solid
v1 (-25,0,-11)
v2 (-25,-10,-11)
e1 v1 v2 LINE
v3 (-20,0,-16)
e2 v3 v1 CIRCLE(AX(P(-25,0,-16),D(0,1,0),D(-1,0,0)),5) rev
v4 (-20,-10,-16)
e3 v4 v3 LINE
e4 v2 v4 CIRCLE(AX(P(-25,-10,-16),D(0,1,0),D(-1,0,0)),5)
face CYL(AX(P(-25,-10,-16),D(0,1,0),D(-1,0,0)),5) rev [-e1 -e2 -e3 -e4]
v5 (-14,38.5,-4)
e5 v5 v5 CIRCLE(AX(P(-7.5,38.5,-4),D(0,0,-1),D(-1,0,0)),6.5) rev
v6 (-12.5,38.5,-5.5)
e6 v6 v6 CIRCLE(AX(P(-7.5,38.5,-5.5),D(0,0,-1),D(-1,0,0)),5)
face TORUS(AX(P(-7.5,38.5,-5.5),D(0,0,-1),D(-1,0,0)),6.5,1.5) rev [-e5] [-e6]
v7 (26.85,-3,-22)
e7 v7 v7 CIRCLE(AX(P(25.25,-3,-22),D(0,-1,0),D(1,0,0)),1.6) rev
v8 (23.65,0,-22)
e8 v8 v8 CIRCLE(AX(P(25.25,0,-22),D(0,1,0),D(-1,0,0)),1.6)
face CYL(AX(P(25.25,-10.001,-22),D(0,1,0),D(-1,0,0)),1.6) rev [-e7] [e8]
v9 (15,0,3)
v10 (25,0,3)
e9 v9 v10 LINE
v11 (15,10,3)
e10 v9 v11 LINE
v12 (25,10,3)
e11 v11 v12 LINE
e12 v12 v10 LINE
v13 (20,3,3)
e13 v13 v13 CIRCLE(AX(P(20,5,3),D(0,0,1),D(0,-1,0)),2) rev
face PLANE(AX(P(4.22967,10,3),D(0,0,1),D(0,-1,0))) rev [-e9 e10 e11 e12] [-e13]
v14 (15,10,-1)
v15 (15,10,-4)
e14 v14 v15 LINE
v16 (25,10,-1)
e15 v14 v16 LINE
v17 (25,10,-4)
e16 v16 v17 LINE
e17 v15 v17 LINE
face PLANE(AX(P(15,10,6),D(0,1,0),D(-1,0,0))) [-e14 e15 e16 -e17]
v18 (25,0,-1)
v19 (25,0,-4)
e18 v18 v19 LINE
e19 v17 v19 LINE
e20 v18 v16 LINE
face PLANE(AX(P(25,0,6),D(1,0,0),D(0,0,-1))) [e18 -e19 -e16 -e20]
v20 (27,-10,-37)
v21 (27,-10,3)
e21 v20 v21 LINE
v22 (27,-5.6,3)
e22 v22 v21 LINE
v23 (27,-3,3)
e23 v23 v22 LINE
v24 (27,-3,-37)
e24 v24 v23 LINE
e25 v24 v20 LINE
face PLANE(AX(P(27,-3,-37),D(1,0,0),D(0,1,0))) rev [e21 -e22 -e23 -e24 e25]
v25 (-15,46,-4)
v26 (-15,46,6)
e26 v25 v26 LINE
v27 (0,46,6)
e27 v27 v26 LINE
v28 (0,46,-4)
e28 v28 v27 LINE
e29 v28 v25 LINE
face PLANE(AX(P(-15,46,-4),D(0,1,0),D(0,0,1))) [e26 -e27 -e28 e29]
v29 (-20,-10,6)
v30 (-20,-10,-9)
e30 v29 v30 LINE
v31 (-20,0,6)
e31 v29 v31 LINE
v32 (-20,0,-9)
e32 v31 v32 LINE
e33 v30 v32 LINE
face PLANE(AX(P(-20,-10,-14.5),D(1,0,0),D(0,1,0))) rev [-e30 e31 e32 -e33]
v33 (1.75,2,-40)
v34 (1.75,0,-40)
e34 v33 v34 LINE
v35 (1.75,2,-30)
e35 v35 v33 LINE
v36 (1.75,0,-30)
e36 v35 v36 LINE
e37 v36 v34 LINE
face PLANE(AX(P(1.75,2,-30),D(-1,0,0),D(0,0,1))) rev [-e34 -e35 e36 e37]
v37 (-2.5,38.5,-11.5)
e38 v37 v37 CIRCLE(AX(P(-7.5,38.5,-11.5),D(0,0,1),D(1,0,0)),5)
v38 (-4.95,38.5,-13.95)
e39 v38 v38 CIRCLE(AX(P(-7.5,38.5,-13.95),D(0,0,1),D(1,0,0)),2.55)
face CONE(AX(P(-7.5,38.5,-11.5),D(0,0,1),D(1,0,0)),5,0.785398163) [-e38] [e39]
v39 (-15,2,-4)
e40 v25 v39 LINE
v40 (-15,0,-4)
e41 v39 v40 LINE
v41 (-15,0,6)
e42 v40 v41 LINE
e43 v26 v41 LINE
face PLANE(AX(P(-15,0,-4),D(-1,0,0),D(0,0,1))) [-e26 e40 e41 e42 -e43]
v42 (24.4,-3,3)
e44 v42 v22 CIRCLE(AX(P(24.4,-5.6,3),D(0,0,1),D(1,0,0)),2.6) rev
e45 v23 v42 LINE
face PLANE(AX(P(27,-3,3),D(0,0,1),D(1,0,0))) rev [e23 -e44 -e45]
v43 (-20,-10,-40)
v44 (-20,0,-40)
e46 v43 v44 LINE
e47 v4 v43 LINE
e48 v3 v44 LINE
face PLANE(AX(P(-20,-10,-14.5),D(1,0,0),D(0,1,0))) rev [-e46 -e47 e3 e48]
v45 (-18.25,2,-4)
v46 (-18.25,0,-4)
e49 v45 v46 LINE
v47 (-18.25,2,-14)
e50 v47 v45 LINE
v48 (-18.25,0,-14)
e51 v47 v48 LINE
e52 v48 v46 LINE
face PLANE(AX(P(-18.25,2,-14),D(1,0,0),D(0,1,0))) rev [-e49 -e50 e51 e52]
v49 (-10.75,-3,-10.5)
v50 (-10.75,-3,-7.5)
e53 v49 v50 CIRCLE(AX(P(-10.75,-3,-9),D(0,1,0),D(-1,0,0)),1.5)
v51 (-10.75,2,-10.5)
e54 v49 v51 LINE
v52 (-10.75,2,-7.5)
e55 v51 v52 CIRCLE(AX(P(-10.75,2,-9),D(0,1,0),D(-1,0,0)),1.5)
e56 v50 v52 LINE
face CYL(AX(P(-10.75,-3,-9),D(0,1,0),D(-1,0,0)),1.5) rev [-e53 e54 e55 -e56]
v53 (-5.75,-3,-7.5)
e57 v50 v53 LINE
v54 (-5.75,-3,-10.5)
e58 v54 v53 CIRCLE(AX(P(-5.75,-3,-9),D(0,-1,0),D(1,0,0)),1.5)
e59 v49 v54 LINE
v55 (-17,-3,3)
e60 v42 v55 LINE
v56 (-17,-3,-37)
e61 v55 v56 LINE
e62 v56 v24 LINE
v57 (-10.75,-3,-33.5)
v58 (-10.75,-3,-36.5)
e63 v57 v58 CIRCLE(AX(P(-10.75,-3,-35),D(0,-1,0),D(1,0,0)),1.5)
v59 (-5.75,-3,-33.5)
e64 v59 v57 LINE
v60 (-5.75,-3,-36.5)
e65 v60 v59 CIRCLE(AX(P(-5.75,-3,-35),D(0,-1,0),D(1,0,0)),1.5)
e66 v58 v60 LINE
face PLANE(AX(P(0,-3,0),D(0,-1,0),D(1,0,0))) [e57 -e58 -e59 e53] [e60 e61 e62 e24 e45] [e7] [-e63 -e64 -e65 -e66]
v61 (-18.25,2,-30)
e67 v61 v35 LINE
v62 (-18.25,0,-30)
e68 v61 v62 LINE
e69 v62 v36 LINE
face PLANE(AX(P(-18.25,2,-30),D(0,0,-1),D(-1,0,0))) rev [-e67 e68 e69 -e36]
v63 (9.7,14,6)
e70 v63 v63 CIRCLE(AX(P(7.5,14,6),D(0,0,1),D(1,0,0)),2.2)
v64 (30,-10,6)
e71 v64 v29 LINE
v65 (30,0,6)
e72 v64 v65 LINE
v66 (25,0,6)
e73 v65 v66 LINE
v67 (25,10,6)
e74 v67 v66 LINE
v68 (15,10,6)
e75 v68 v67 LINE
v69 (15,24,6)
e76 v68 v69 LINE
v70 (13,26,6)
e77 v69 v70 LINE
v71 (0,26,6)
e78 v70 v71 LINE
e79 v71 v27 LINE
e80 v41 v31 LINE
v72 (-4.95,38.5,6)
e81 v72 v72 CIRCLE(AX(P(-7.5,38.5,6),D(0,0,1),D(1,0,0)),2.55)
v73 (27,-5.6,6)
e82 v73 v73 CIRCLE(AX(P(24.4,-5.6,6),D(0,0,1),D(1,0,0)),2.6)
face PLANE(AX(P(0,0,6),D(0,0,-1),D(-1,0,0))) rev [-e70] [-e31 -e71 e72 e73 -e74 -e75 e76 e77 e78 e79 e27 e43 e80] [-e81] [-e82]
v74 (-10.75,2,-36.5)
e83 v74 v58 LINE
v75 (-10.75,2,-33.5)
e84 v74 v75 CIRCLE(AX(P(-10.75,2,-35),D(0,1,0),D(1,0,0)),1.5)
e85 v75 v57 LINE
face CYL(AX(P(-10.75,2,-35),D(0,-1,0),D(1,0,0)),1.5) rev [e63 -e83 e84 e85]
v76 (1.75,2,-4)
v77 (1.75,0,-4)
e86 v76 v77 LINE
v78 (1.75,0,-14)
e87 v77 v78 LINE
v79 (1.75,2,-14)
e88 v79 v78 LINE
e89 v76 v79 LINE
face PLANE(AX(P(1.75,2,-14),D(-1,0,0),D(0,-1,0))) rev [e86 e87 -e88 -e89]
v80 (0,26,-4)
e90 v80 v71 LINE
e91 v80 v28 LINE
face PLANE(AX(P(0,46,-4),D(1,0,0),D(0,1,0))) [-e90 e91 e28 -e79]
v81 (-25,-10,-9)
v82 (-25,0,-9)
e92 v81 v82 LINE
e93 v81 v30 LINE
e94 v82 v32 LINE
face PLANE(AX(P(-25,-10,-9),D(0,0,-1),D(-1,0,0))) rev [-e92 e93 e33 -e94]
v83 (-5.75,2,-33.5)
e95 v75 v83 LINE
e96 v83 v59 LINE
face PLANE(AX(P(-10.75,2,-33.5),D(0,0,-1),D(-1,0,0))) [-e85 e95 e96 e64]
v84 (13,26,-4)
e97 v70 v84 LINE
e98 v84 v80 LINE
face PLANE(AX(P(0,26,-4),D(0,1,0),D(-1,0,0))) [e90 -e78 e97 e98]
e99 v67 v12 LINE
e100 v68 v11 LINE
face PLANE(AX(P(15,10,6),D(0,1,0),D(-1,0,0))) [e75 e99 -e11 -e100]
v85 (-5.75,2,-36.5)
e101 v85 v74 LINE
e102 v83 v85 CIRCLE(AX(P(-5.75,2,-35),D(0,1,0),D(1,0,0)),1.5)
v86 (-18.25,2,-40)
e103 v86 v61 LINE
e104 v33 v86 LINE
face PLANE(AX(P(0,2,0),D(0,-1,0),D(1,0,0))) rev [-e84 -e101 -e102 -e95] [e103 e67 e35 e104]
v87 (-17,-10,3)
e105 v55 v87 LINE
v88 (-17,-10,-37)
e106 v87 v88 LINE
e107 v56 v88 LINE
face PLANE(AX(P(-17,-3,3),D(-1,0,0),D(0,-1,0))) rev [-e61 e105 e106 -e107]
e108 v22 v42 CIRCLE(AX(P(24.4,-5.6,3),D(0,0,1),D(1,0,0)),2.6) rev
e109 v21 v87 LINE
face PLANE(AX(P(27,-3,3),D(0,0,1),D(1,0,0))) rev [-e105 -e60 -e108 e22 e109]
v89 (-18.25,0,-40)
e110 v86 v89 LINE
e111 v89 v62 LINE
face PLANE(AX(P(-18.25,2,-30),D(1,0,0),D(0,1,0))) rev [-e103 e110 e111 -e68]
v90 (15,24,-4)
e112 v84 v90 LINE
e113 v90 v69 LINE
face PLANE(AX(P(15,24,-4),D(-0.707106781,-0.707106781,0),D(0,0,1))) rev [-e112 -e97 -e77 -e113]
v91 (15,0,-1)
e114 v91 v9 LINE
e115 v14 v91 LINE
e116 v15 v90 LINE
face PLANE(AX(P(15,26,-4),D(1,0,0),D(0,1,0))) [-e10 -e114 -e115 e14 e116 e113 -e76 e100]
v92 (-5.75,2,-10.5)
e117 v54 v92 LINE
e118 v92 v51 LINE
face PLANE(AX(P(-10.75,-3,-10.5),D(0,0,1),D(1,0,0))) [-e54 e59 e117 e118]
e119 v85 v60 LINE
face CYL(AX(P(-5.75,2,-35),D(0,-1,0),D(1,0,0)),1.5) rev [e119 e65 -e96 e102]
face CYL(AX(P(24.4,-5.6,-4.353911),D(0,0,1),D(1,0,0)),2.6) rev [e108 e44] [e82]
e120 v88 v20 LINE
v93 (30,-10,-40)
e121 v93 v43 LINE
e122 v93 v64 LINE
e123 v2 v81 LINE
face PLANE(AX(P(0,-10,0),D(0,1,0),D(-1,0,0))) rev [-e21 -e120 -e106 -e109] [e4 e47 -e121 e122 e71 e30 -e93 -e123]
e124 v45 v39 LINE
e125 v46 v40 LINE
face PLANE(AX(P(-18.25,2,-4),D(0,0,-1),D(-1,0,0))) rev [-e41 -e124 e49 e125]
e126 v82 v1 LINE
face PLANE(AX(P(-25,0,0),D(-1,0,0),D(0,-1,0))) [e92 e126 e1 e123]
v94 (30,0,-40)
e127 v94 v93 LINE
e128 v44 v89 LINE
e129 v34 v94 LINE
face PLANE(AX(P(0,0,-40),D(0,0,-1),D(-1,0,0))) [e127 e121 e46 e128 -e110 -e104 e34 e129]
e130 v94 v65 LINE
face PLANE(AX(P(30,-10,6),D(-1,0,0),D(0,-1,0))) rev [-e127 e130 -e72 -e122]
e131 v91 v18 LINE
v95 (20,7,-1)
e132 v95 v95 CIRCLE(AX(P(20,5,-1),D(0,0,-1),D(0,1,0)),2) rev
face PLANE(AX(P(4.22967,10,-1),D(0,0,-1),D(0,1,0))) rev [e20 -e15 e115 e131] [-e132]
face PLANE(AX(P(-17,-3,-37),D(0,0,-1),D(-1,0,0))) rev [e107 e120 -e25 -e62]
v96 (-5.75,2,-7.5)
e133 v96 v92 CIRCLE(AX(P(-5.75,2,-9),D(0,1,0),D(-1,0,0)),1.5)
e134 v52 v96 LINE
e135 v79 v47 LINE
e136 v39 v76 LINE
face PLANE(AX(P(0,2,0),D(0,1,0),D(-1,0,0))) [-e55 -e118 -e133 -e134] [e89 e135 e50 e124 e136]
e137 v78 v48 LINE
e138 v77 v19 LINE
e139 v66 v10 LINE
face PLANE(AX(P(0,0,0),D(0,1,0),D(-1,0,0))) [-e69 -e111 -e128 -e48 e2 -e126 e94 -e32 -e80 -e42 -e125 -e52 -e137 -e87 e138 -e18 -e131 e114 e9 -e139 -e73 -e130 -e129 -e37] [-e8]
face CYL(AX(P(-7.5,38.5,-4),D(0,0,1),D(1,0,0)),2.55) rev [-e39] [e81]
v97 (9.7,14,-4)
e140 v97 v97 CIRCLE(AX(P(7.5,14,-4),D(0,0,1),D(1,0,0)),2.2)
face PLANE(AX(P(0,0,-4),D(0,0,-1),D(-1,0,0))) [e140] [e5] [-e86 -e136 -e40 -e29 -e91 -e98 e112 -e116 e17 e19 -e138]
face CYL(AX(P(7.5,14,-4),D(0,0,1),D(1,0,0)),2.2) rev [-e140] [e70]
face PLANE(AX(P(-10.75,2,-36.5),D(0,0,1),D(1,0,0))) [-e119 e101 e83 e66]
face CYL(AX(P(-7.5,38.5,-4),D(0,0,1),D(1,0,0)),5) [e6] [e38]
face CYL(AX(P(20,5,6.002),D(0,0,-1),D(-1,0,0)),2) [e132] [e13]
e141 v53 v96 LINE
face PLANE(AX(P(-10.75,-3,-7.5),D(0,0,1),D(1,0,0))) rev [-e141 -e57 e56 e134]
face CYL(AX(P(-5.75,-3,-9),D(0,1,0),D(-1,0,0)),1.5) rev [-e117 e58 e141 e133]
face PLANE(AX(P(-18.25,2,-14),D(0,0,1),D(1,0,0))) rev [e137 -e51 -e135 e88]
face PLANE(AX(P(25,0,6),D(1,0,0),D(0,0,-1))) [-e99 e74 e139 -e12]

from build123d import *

# Parameters (mm, degrees)
BOSS_EXTRUDE1_DEPTH      = 6
BOSS_EXTRUDE1_DEPTH_BACK = 4
SKETCH1_R                = 2.55
SKETCH1_R_2              = 2.2
SKETCH4_W                = 10
SKETCH4_H                = 10
BOSS_EXTRUDE4_DEPTH      = 10
SKETCH5_W                = 4
SKETCH5_H                = 10
CUT_EXTRUDE1_DEPTH       = 10
BOSS_EXTRUDE5_REACH      = 54.82
SKETCH6_R                = 2
CHAMFER1_SIZE            = 2
SKETCH7_W                = 50
SKETCH7_H                = 20.5
BOSS_EXTRUDE6_DEPTH      = 10
SKETCH13_W               = 50
SKETCH13_H               = 10
BOSS_EXTRUDE9_DEPTH      = 25.5
SKETCH16_W               = 44
SKETCH16_H               = 40
CUT_EXTRUDE3_DEPTH       = 7
SKETCH17_R               = 2.6
CUT_EXTRUDE4_DEPTH       = 3
SKETCH18_W               = 2
SKETCH18_H               = 10
BOSS_EXTRUDE11_DEPTH     = 5
FILLET2_R                = 5
CUT_EXTRUDE5_REACH       = 67.666
SKETCH20_R               = 2.55
FILLET5_R                = 1.5
CUT_EXTRUDE6_DEPTH       = 3
BOSS_EXTRUDE12_START     = 2
SKETCH22_W               = 20
SKETCH22_H               = 10
BOSS_EXTRUDE12_DEPTH     = 2
CUT_EXTRUDE7_REACH       = 69.941
SKETCH23_R               = 1.6
CUT_EXTRUDE8_DEPTH       = 68.941151006


with BuildPart() as part:
    # Sketch1 → Boss-Extrude1 (new, two sides: drawn at the far end of the back side and taken through both)
    with BuildSketch(Plane.XY.offset(-BOSS_EXTRUDE1_DEPTH_BACK)):
        Polygon((-15, 0), (-15, 46), (0, 46), (0, 26), (15, 26), (15, 0), align=None)
        with Locations((-7.5, 38.5)):
            Circle(SKETCH1_R, mode=Mode.SUBTRACT)
        with Locations((7.5, 14)):
            Circle(SKETCH1_R_2, mode=Mode.SUBTRACT)
    extrude(amount=BOSS_EXTRUDE1_DEPTH + BOSS_EXTRUDE1_DEPTH_BACK)

    # Sketch4 → Boss-Extrude4 (add)
    with BuildSketch(Plane(origin=(0, 0, -4), x_dir=(-1, 0, 0), z_dir=(0, 0, -1))):
        with Locations((-20, 5)):
            Rectangle(SKETCH4_W, SKETCH4_H)
    extrude(amount=-BOSS_EXTRUDE4_DEPTH)

    # Sketch5 → Cut-Extrude1 (cut)
    with BuildSketch(Plane(origin=(25, 0, 0), x_dir=(0, 0, -1), z_dir=(1, 0, 0))):
        with Locations((-1, 5)):
            Rectangle(SKETCH5_W, SKETCH5_H)
    extrude(amount=-CUT_EXTRUDE1_DEPTH, mode=Mode.SUBTRACT)

    # Sketch6 → Boss-Extrude5 (add, up to next)
    with BuildSketch(Plane.XY.offset(-1), mode=Mode.PRIVATE) as boss_extrude5_sk1:
        with Locations(Location((20, 5, 0), (0, 0, 90))):
            Circle(SKETCH6_R)
    boss_extrude5_tool1 = extrude(boss_extrude5_sk1.sketch, amount=BOSS_EXTRUDE5_REACH, mode=Mode.PRIVATE) - part.part
    add(boss_extrude5_tool1.solids().sort_by_distance((20, 5, -1))[0])

    # Chamfer1
    chamfer1_edges = [part.edges().sort_by_distance(p)[0] for p in [
        (15, 26, 1),
    ]]
    chamfer(chamfer1_edges, length=CHAMFER1_SIZE)

    # Sketch7 → Boss-Extrude6 (add)
    with BuildSketch(Plane.XZ):
        with Locations((5, -4.25)):
            Rectangle(SKETCH7_W, SKETCH7_H)
    extrude(amount=BOSS_EXTRUDE6_DEPTH)

    # Sketch13 → Boss-Extrude9 (add)
    with BuildSketch(Plane(origin=(0, 0, -14.5), x_dir=(-1, 0, 0), z_dir=(0, 0, -1))):
        with Locations((-5, -5)):
            Rectangle(SKETCH13_W, SKETCH13_H)
    extrude(amount=BOSS_EXTRUDE9_DEPTH)

    # Sketch16 → Cut-Extrude3 (cut)
    with BuildSketch(Plane.XZ.offset(10)):
        with Locations((5, -17)):
            Rectangle(SKETCH16_W, SKETCH16_H)
    extrude(amount=-CUT_EXTRUDE3_DEPTH, mode=Mode.SUBTRACT)

    # Sketch17 → Cut-Extrude4 (cut)
    with BuildSketch(Plane.XY.offset(6)):
        with Locations((24.4, -5.6)):
            Circle(SKETCH17_R)
    extrude(amount=-CUT_EXTRUDE4_DEPTH, mode=Mode.SUBTRACT)

    # Sketch18 → Boss-Extrude11 (add)
    with BuildSketch(Plane.ZY.offset(20)):
        with Locations((-10, -5)):
            Rectangle(SKETCH18_W, SKETCH18_H)
    extrude(amount=BOSS_EXTRUDE11_DEPTH)

    # Fillet2
    fillet2_edges = [part.edges().sort_by_distance(p)[0] for p in [
        (-20, -5, -11),
    ]]
    fillet(fillet2_edges, radius=FILLET2_R - 0.0001)  # a hair under: the kernel refuses the full size

    # Sketch19 → Revolve1 (revolve)
    with BuildSketch(Plane.ZY.offset(7.5), mode=Mode.PRIVATE) as revolve1_sk:
        Polygon((-4, 38.5), (-14, 38.5), (-14, 41), (-11.5, 43.5), (-4, 43.5), align=None)
    revolve(revolve1_sk.sketch.rotate(Axis((-7.5, 38.5, -4), (0, 0, -1)), 90), axis=Axis((-7.5, 38.5, -4), (0, 0, -1)))

    # Sketch20 → Cut-Extrude5 (cut, up to next)
    with BuildSketch(Plane.XY.offset(-4), mode=Mode.PRIVATE) as cut_extrude5_sk1:
        with Locations((-7.5, 38.5)):
            Circle(SKETCH20_R)
    cut_extrude5_tool1 = extrude(cut_extrude5_sk1.sketch, amount=-CUT_EXTRUDE5_REACH, mode=Mode.PRIVATE) & part.part
    add(cut_extrude5_tool1.solids().sort_by_distance((-7.5, 38.5, -4))[0], mode=Mode.SUBTRACT)

    # Fillet5
    fillet5_edges = [part.edges().sort_by_distance(p)[0] for p in [
        (-12.5, 38.5, -4),
    ]]
    fillet(fillet5_edges, radius=FILLET5_R)

    # Sketch12 → Cut-Extrude6 (cut)
    with BuildSketch(Plane(origin=(0, 0, 0), x_dir=(1, 0, 0), z_dir=(0, 1, 0))):
        with BuildLine():
            Line((-10.75, 10.5), (-5.75, 10.5))
            ThreePointArc((-5.75, 10.5), (-4.25, 9), (-5.75, 7.5))
            Line((-5.75, 7.5), (-10.75, 7.5))
            ThreePointArc((-10.75, 7.5), (-12.25, 9), (-10.75, 10.5))
        make_face()
    extrude(amount=-CUT_EXTRUDE6_DEPTH, mode=Mode.SUBTRACT)

    # Sketch22 → Boss-Extrude12 (add)
    # profile 1 of 2: a face of its own
    with BuildSketch(Plane(origin=(0, 0, 0), x_dir=(1, 0, 0), z_dir=(0, 1, 0)).offset(BOSS_EXTRUDE12_START)):
        with Locations((-8.25, 9)):
            Rectangle(SKETCH22_W, SKETCH22_H)
        with BuildLine():
            Line((-10.75, 7.5), (-5.75, 7.5))
            ThreePointArc((-5.75, 7.5), (-4.25, 9), (-5.75, 10.5))
            Line((-5.75, 10.5), (-10.75, 10.5))
            ThreePointArc((-10.75, 10.5), (-12.25, 9), (-10.75, 7.5))
        make_face(mode=Mode.SUBTRACT)
    # profile 2 of 2: a face of its own
    with BuildSketch(Plane(origin=(0, 0, 0), x_dir=(1, 0, 0), z_dir=(0, 1, 0)).offset(BOSS_EXTRUDE12_START)):
        with Locations((-8.25, 35)):
            Rectangle(SKETCH22_W, SKETCH22_H)
        with BuildLine():
            Line((-10.75, 36.5), (-5.75, 36.5))
            ThreePointArc((-5.75, 36.5), (-4.25, 35), (-5.75, 33.5))
            Line((-5.75, 33.5), (-10.75, 33.5))
            ThreePointArc((-10.75, 33.5), (-12.25, 35), (-10.75, 36.5))
        make_face(mode=Mode.SUBTRACT)
    extrude(amount=-BOSS_EXTRUDE12_DEPTH)

    # Sketch23 → Cut-Extrude7 (cut, up to next)
    with BuildSketch(Plane(origin=(0, 0, 0), x_dir=(1, 0, 0), z_dir=(0, 1, 0)), mode=Mode.PRIVATE) as cut_extrude7_sk1:
        with Locations(Location((25.25, 22, 0), (0, 0, 180))):
            Circle(SKETCH23_R)
    cut_extrude7_tool1 = extrude(cut_extrude7_sk1.sketch, amount=-CUT_EXTRUDE7_REACH, mode=Mode.PRIVATE) & part.part
    add(cut_extrude7_tool1.solids().sort_by_distance((25.25, 0, -22))[0], mode=Mode.SUBTRACT)

    # Sketch24 → Cut-Extrude8 (cut, through all)
    with BuildSketch(Plane(origin=(0, 0, 0), x_dir=(1, 0, 0), z_dir=(0, 1, 0))):
        with BuildLine():
            Line((-10.75, 33.5), (-5.75, 33.5))
            ThreePointArc((-5.75, 33.5), (-4.25, 35), (-5.75, 36.5))
            Line((-5.75, 36.5), (-10.75, 36.5))
            ThreePointArc((-10.75, 36.5), (-12.25, 35), (-10.75, 33.5))
        make_face()
    extrude(amount=-CUT_EXTRUDE8_DEPTH, mode=Mode.SUBTRACT)


solid = part.part
